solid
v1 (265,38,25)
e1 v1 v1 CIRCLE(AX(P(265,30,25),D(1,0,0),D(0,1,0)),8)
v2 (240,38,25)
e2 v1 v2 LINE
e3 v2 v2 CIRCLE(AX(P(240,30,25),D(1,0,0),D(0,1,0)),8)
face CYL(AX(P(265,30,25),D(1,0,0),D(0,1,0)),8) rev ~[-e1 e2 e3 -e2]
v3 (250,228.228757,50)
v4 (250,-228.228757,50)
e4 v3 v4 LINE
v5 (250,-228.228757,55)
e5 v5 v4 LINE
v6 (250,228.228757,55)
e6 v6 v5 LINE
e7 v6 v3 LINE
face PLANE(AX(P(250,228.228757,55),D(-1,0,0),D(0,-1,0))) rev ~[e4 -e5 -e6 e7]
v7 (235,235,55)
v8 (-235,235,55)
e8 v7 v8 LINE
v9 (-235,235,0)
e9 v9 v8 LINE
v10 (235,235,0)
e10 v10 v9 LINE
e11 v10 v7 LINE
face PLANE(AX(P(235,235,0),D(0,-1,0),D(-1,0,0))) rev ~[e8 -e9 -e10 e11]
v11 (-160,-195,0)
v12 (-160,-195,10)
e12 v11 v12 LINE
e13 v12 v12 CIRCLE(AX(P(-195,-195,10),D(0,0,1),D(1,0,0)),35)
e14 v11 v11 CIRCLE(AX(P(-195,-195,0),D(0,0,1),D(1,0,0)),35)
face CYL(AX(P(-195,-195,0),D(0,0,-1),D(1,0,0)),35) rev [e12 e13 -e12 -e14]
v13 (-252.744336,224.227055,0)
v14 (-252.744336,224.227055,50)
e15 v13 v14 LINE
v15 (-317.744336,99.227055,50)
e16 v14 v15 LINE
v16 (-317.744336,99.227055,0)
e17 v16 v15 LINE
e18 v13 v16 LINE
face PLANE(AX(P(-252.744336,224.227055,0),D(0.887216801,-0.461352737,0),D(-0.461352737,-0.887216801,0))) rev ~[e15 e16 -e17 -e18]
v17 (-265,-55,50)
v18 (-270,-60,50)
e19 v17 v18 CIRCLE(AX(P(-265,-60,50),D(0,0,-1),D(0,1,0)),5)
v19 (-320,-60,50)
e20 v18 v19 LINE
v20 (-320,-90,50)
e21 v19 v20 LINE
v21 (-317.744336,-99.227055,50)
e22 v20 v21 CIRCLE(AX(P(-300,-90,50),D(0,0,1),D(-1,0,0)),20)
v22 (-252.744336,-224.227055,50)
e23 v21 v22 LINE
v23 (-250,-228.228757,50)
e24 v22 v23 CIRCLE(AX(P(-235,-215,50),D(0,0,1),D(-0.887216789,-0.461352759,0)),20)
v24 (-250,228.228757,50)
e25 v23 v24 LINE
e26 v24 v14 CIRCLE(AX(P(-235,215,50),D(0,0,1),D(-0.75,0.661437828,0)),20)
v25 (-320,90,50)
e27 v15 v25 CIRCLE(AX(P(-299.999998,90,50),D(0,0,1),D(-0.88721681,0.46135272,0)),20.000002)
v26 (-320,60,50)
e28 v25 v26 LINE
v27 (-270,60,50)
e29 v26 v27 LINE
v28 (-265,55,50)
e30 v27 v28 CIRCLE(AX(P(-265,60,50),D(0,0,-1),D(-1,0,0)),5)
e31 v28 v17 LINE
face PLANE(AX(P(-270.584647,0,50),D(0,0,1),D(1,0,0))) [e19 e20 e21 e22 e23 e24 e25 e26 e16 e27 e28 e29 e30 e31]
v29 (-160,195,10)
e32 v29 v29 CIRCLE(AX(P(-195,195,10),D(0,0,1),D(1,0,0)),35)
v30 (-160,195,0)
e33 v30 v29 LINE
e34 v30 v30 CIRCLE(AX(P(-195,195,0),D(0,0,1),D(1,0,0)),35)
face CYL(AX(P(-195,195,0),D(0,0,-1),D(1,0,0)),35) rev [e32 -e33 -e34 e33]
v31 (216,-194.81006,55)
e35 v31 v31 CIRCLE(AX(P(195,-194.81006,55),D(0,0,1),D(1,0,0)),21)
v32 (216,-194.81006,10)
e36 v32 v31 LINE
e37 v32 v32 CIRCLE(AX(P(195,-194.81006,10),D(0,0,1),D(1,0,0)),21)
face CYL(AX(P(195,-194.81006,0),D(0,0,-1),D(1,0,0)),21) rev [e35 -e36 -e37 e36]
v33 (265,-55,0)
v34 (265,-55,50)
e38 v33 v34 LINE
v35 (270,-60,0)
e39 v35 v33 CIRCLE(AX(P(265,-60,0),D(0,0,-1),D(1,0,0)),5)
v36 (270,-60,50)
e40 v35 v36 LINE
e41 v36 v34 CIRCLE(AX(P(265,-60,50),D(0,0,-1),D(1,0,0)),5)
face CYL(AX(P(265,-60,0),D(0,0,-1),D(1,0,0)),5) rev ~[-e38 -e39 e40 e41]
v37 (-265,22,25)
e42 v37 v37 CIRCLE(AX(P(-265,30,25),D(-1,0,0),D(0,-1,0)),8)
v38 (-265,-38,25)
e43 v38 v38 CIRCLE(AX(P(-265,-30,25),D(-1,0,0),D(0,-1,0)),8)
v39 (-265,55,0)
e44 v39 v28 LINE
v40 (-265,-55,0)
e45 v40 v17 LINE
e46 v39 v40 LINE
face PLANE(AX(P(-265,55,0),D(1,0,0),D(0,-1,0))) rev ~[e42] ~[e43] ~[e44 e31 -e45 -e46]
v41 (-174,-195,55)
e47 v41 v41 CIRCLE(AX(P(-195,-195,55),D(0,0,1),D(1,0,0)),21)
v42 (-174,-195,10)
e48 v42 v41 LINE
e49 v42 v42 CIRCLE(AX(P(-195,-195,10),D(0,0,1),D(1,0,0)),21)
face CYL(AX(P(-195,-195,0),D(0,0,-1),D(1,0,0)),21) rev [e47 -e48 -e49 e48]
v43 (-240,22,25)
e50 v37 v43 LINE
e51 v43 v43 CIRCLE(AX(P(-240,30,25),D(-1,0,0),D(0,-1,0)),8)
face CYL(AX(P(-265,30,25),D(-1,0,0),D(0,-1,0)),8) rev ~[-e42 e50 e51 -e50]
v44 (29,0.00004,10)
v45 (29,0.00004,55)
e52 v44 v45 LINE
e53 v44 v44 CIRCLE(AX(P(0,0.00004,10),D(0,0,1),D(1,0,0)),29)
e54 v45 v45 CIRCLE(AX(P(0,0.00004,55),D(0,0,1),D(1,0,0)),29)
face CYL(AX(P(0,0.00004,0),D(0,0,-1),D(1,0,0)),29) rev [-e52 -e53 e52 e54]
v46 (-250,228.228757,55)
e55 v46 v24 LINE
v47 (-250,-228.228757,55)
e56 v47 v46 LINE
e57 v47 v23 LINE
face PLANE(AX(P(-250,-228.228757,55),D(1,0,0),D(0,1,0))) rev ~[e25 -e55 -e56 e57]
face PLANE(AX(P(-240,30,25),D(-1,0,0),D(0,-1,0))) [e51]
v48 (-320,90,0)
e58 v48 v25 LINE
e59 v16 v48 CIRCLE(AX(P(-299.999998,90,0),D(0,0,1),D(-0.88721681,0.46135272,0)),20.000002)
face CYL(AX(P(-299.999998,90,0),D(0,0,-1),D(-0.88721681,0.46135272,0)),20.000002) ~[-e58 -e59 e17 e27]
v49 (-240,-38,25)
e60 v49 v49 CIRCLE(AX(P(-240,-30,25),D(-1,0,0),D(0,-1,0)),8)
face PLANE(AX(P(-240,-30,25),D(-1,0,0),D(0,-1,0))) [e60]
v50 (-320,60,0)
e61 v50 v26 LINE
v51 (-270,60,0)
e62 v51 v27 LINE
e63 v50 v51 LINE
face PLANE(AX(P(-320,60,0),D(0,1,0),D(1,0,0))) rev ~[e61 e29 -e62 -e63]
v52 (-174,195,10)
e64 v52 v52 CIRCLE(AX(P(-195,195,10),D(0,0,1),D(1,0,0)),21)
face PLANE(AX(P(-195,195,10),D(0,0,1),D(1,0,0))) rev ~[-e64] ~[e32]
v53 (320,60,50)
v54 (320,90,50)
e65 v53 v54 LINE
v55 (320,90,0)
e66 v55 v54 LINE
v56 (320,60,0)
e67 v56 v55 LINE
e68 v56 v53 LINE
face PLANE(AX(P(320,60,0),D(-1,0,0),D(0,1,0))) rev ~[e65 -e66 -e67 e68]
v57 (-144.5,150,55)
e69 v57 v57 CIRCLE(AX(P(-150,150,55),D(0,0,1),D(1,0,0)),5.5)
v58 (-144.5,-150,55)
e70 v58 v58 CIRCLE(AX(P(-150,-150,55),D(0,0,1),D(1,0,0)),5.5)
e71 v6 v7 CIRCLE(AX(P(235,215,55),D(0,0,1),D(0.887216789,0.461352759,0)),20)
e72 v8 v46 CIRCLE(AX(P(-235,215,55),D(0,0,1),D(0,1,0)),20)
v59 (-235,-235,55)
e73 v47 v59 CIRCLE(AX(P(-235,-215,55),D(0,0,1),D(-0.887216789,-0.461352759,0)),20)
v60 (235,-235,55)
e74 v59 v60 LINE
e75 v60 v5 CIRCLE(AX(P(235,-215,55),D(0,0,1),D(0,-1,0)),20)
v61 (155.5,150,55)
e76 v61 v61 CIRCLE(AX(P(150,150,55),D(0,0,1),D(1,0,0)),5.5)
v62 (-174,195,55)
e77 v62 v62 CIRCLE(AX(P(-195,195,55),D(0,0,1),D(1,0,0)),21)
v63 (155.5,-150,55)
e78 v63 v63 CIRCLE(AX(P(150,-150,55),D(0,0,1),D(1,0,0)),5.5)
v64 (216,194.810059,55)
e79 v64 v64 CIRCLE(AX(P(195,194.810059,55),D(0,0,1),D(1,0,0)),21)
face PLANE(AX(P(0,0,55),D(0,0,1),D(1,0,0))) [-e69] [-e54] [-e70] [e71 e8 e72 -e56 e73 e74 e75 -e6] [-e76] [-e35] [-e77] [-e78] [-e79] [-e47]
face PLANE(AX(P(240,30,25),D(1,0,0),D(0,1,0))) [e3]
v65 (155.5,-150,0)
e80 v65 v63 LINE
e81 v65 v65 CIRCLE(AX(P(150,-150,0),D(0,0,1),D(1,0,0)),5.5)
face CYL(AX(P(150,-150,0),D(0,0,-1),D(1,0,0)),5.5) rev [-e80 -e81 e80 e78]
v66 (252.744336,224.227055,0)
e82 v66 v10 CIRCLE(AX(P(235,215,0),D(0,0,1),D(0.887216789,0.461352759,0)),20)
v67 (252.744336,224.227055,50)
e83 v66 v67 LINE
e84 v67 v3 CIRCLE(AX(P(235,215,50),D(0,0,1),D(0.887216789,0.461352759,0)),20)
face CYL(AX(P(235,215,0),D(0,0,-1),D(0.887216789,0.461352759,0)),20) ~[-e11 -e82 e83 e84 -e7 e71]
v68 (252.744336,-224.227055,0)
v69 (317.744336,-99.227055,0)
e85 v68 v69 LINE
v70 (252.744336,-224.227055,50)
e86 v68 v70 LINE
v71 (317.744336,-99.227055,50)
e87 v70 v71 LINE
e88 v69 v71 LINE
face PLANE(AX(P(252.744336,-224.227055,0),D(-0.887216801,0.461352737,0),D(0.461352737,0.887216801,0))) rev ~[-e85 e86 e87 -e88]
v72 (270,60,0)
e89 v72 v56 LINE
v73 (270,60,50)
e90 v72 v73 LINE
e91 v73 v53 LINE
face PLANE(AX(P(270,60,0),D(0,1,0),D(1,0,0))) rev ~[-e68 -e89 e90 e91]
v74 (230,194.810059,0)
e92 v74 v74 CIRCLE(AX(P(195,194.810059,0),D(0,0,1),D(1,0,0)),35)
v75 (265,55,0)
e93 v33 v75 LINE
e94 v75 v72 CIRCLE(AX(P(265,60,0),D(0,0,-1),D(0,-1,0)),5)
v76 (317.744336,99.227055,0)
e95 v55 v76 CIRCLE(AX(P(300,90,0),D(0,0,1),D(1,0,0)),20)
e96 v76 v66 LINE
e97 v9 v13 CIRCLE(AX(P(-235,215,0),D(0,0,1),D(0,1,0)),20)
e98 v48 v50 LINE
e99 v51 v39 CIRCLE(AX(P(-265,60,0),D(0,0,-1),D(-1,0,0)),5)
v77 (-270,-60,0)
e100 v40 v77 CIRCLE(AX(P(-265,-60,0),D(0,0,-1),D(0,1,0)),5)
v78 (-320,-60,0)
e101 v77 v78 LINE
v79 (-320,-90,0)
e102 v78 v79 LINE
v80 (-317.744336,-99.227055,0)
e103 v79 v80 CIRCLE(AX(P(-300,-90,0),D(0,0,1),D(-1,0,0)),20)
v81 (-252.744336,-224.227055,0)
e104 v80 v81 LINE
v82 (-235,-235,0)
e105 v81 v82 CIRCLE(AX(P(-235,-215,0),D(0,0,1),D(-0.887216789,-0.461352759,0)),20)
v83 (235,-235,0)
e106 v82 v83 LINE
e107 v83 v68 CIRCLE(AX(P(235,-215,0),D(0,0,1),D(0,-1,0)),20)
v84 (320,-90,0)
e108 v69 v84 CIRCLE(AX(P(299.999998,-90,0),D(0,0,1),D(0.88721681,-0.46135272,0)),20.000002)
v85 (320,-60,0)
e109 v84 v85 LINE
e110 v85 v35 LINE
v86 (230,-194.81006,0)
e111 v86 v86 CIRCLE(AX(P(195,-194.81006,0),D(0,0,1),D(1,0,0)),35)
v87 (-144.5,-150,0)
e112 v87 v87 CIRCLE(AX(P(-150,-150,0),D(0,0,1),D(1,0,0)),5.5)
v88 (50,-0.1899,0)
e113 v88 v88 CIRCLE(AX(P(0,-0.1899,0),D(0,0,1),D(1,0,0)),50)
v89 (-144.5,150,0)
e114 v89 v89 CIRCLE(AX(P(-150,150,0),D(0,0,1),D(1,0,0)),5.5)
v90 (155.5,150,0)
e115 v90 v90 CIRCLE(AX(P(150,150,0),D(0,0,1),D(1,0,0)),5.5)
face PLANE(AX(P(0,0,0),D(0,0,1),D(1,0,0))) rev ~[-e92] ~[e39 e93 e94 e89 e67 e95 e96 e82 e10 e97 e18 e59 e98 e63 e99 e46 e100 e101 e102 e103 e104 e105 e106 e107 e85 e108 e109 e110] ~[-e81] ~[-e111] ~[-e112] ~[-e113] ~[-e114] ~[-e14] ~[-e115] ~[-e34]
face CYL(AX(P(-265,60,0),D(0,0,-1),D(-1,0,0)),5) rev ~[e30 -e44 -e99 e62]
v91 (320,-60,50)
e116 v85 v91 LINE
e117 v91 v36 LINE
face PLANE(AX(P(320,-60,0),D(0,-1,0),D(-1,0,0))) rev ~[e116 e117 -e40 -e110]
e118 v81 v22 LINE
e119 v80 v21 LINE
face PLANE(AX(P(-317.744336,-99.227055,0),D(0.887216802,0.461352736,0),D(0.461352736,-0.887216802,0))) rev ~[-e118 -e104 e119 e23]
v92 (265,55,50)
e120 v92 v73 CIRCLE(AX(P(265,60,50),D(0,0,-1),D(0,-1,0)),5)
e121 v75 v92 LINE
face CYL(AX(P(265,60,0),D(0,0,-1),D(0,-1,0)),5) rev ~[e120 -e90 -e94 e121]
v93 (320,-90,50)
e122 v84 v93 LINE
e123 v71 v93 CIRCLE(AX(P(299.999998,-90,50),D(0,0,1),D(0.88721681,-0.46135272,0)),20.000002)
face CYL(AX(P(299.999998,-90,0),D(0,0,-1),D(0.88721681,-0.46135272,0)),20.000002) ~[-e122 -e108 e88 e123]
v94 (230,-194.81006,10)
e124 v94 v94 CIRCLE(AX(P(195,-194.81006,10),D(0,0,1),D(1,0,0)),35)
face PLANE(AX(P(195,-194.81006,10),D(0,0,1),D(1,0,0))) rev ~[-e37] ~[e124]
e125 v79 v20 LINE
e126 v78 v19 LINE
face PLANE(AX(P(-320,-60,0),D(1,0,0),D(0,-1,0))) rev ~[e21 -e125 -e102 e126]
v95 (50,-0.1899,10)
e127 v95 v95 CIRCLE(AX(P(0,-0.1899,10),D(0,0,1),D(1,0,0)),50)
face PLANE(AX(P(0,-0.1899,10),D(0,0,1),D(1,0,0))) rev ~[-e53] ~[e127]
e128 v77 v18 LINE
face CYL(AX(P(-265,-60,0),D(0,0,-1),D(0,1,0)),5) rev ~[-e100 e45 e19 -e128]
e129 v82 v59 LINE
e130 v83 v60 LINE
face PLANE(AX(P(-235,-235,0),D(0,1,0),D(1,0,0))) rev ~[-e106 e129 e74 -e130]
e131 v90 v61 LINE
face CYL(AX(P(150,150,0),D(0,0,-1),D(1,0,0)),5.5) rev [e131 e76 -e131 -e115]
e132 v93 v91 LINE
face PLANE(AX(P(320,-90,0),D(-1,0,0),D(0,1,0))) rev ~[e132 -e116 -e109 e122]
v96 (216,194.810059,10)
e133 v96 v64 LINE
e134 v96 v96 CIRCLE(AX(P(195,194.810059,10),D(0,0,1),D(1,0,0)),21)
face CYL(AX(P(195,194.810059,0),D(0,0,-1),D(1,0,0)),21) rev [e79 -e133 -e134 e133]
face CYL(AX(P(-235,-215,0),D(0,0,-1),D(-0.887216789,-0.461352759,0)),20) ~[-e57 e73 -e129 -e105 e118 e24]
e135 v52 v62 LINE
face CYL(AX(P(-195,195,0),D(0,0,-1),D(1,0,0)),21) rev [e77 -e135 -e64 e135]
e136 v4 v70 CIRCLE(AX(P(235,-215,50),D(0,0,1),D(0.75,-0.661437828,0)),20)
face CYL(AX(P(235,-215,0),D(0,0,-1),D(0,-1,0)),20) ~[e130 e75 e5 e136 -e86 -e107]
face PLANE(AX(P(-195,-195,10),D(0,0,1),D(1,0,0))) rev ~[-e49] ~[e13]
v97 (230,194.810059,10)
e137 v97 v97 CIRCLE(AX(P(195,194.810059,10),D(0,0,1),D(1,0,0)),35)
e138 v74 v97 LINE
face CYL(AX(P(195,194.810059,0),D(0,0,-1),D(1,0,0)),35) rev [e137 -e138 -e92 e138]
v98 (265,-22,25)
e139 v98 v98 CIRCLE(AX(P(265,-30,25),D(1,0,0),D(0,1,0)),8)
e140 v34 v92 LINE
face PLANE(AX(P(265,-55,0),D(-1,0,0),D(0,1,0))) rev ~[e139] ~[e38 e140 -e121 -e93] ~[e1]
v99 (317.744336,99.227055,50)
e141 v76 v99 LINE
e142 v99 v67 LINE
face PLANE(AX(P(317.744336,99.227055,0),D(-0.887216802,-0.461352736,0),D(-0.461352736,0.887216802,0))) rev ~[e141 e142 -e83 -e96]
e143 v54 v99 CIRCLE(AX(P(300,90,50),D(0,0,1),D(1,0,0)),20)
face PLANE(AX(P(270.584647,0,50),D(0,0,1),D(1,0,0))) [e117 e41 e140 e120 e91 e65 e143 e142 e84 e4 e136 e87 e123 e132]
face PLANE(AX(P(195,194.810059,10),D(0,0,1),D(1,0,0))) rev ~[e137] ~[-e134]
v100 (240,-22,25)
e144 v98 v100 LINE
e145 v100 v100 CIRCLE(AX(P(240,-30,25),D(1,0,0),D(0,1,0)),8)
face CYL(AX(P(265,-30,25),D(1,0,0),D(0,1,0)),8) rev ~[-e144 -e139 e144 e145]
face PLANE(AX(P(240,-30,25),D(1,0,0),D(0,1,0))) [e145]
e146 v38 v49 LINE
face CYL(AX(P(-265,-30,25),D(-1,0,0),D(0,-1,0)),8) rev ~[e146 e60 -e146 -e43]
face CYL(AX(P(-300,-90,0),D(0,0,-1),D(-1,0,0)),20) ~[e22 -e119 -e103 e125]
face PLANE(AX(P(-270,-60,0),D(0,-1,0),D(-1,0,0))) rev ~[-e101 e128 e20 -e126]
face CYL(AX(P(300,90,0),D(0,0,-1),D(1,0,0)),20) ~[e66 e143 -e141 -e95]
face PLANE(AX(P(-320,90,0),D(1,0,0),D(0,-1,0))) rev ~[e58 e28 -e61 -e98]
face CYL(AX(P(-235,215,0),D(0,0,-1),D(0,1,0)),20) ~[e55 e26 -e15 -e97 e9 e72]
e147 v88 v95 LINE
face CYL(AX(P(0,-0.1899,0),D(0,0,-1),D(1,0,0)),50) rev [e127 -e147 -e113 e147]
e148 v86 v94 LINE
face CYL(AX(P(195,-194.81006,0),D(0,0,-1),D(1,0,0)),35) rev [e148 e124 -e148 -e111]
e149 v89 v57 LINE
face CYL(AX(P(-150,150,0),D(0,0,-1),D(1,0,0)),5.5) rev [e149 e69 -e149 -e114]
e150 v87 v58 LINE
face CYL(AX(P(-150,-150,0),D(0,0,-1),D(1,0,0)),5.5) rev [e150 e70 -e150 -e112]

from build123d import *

# Parameters (mm, degrees)
F0_R     = 35
F0_R_2   = 5.5
F0_R_3   = 50
F0_R_4   = 29
F0_R_5   = 21
F1_DEPTH = 55
F2_DEPTH = 10
F4_DEPTH = 5
F5_R     = 8
F6_DEPTH = 25
F7_R     = 8
F8_DEPTH = 25


# Not quite as in the source:
# - ends of sketch curves that miss each other by under 0.0002 mm in the source are joined


with BuildPart() as f1:
    # F0 (on Top) → F1 (new body)
    with BuildSketch(Plane.XY):
        with BuildLine():
            ThreePointArc((-265, -55), (-261.4644660941, -63.5355339059), (-270, -60))
            Line((-270, -60), (-320, -60))
            Line((-320, -60), (-320, -90))
            ThreePointArc((-320, -90), (-319.427901562, -94.7493832125), (-317.7443359101, -99.2270549532))
            Line((-317.7443359101, -99.2270549532), (-252.744336, -224.227055))
            ThreePointArc((-252.744336, -224.227055), (-245.3792798627, -232.0959220147), (-235, -235))
            Line((-235, -235), (235, -235))
            ThreePointArc((235, -235), (245.3792798627, -232.0959220147), (252.7443359101, -224.2270549532))
            Line((252.7443359101, -224.2270549532), (317.744336, -99.227055))
            ThreePointArc((317.744336, -99.227055), (319.427901562, -94.7493832125), (320, -90))
            Line((320, -90), (320, -60))
            Line((320, -60), (270, -60))
            ThreePointArc((270, -60), (261.4644660941, -63.5355339059), (265, -55))
            Line((265, -55), (265, 55))
            ThreePointArc((265, 55), (261.4644660941, 63.5355339059), (270, 60))
            Line((270, 60), (320, 60))
            Line((320, 60), (320, 90))
            ThreePointArc((320, 90), (319.427901562, 94.7493832125), (317.7443359101, 99.2270549532))
            Line((317.7443359101, 99.2270549532), (252.744336, 224.227055))
            ThreePointArc((252.744336, 224.227055), (245.3792798627, 232.0959220147), (235, 235))
            Line((235, 235), (-235, 235))
            ThreePointArc((-235, 235), (-245.3792798627, 232.0959220147), (-252.7443359101, 224.2270549532))
            Line((-252.7443359101, 224.2270549532), (-317.744336, 99.227055))
            ThreePointArc((-317.744336, 99.227055), (-319.427901562, 94.7493832125), (-320, 90))
            Line((-320, 90), (-320, 60))
            Line((-320, 60), (-270, 60))
            ThreePointArc((-270, 60), (-261.4644660941, 63.5355339059), (-265, 55))
            Line((-265, 55), (-265, -55))
        make_face()
        with Locations((-195, -195)):
            Circle(F0_R, mode=Mode.SUBTRACT)
        with Locations((-150, -150)):
            Circle(F0_R_2, mode=Mode.SUBTRACT)
        with Locations((150, -150)):
            Circle(F0_R_2, mode=Mode.SUBTRACT)
        with Locations((195, -194.81006)):
            Circle(F0_R, mode=Mode.SUBTRACT)
        with Locations((0, -0.1899)):
            Circle(F0_R_3, mode=Mode.SUBTRACT)
        with Locations((-195, 195)):
            Circle(F0_R, mode=Mode.SUBTRACT)
        with Locations((-150, 150)):
            Circle(F0_R_2, mode=Mode.SUBTRACT)
        with Locations((150, 150)):
            Circle(F0_R_2, mode=Mode.SUBTRACT)
        with Locations((195, 194.810059)):
            Circle(F0_R, mode=Mode.SUBTRACT)
        with Locations((0, -0.1899)):
            Circle(F0_R_3)
        with Locations((0, 4e-05)):
            Circle(F0_R_4, mode=Mode.SUBTRACT)
        with Locations((-195, 195)):
            Circle(F0_R)
        with Locations((-195, 195)):
            Circle(F0_R_5, mode=Mode.SUBTRACT)
        with Locations((195, 194.810059)):
            Circle(F0_R)
        with Locations((195, 194.810059)):
            Circle(F0_R_5, mode=Mode.SUBTRACT)
        with Locations((-195, -195)):
            Circle(F0_R)
        with Locations((-195, -195)):
            Circle(F0_R_5, mode=Mode.SUBTRACT)
        with Locations((195, -194.81006)):
            Circle(F0_R)
        with Locations((195, -194.81006)):
            Circle(F0_R_5, mode=Mode.SUBTRACT)
    extrude(amount=F1_DEPTH)

    # F0 (on Top) → F2 (cut)
    with BuildSketch(Plane.XY):
        with Locations((195, 194.810059)):
            Circle(F0_R)
        with Locations((195, 194.810059)):
            Circle(F0_R_5, mode=Mode.SUBTRACT)
        with Locations((-195, 195)):
            Circle(F0_R)
        with Locations((-195, 195)):
            Circle(F0_R_5, mode=Mode.SUBTRACT)
        with Locations((0, -0.1899)):
            Circle(F0_R_3)
        with Locations((0, 4e-05)):
            Circle(F0_R_4, mode=Mode.SUBTRACT)
        with Locations((-195, -195)):
            Circle(F0_R)
        with Locations((-195, -195)):
            Circle(F0_R_5, mode=Mode.SUBTRACT)
        with Locations((195, -194.81006)):
            Circle(F0_R)
        with Locations((195, -194.81006)):
            Circle(F0_R_5, mode=Mode.SUBTRACT)
    extrude(amount=F2_DEPTH, mode=Mode.SUBTRACT)

    # F3 (on face) → F4 (cut)
    with BuildSketch(Plane.XY.offset(55)):
        with BuildLine():
            Line((270, 60), (320, 60))
            Line((320, 60), (320, 90))
            ThreePointArc((320, 90), (319.427901562, 94.7493832125), (317.7443359101, 99.2270549532))
            Line((317.7443359101, 99.2270549532), (252.744336, 224.227055))
            ThreePointArc((252.744336, 224.227055), (251.4939773544, 226.311441724), (250, 228.2287566232))
            Line((250, 228.2287566232), (250, -228.2287565553))
            ThreePointArc((250, -228.2287565553), (251.4939773092, -226.3114416643), (252.7443359101, -224.2270549532))
            Line((252.7443359101, -224.2270549532), (317.744336, -99.227055))
            ThreePointArc((317.744336, -99.227055), (319.4279015605, -94.7493832184), (320, -90))
            Line((320, -90), (320, -60))
            Line((320, -60), (270, -60))
            ThreePointArc((270, -60), (261.4644660941, -63.5355339059), (265, -55))
            Line((265, -55), (265, 55))
            ThreePointArc((265, 55), (261.4644660941, 63.5355339059), (270, 60))
        make_face()
        with BuildLine():
            Line((-250, -228.2287566232), (-250, 228.2287565553))
            ThreePointArc((-250, 228.2287565553), (-251.4939773092, 226.3114416643), (-252.7443359101, 224.2270549532))
            Line((-252.7443359101, 224.2270549532), (-317.744336, 99.227055))
            ThreePointArc((-317.744336, 99.227055), (-319.4279015605, 94.7493832184), (-320, 90))
            Line((-320, 90), (-320, 60))
            Line((-320, 60), (-270, 60))
            ThreePointArc((-270, 60), (-261.4644660941, 63.5355339059), (-265, 55))
            Line((-265, 55), (-265, -55))
            ThreePointArc((-265, -55), (-261.4644660941, -63.5355339059), (-270, -60))
            Line((-270, -60), (-320, -60))
            Line((-320, -60), (-320, -90))
            ThreePointArc((-320, -90), (-319.427901562, -94.7493832125), (-317.7443359101, -99.2270549532))
            Line((-317.7443359101, -99.2270549532), (-252.744336, -224.227055))
            ThreePointArc((-252.744336, -224.227055), (-251.4939773544, -226.311441724), (-250, -228.2287566232))
        make_face()
    extrude(amount=-F4_DEPTH, mode=Mode.SUBTRACT)

    # F5 (on face) → F6 (cut)
    with BuildSketch(Plane.YZ.offset(265)):
        with Locations((30, 25)):
            Circle(F5_R)
        with Locations((-30, 25)):
            Circle(F5_R)
    extrude(amount=-F6_DEPTH, mode=Mode.SUBTRACT)

    # F7 (on face) → F8 (cut)
    with BuildSketch(Plane(origin=(-265, 0, 0), x_dir=(0, -1, 0), z_dir=(-1, 0, 0))):
        with Locations((-30, 25)):
            Circle(F7_R)
        with Locations((30, 25)):
            Circle(F7_R)
    extrude(amount=-F8_DEPTH, mode=Mode.SUBTRACT)


solid = f1.part
